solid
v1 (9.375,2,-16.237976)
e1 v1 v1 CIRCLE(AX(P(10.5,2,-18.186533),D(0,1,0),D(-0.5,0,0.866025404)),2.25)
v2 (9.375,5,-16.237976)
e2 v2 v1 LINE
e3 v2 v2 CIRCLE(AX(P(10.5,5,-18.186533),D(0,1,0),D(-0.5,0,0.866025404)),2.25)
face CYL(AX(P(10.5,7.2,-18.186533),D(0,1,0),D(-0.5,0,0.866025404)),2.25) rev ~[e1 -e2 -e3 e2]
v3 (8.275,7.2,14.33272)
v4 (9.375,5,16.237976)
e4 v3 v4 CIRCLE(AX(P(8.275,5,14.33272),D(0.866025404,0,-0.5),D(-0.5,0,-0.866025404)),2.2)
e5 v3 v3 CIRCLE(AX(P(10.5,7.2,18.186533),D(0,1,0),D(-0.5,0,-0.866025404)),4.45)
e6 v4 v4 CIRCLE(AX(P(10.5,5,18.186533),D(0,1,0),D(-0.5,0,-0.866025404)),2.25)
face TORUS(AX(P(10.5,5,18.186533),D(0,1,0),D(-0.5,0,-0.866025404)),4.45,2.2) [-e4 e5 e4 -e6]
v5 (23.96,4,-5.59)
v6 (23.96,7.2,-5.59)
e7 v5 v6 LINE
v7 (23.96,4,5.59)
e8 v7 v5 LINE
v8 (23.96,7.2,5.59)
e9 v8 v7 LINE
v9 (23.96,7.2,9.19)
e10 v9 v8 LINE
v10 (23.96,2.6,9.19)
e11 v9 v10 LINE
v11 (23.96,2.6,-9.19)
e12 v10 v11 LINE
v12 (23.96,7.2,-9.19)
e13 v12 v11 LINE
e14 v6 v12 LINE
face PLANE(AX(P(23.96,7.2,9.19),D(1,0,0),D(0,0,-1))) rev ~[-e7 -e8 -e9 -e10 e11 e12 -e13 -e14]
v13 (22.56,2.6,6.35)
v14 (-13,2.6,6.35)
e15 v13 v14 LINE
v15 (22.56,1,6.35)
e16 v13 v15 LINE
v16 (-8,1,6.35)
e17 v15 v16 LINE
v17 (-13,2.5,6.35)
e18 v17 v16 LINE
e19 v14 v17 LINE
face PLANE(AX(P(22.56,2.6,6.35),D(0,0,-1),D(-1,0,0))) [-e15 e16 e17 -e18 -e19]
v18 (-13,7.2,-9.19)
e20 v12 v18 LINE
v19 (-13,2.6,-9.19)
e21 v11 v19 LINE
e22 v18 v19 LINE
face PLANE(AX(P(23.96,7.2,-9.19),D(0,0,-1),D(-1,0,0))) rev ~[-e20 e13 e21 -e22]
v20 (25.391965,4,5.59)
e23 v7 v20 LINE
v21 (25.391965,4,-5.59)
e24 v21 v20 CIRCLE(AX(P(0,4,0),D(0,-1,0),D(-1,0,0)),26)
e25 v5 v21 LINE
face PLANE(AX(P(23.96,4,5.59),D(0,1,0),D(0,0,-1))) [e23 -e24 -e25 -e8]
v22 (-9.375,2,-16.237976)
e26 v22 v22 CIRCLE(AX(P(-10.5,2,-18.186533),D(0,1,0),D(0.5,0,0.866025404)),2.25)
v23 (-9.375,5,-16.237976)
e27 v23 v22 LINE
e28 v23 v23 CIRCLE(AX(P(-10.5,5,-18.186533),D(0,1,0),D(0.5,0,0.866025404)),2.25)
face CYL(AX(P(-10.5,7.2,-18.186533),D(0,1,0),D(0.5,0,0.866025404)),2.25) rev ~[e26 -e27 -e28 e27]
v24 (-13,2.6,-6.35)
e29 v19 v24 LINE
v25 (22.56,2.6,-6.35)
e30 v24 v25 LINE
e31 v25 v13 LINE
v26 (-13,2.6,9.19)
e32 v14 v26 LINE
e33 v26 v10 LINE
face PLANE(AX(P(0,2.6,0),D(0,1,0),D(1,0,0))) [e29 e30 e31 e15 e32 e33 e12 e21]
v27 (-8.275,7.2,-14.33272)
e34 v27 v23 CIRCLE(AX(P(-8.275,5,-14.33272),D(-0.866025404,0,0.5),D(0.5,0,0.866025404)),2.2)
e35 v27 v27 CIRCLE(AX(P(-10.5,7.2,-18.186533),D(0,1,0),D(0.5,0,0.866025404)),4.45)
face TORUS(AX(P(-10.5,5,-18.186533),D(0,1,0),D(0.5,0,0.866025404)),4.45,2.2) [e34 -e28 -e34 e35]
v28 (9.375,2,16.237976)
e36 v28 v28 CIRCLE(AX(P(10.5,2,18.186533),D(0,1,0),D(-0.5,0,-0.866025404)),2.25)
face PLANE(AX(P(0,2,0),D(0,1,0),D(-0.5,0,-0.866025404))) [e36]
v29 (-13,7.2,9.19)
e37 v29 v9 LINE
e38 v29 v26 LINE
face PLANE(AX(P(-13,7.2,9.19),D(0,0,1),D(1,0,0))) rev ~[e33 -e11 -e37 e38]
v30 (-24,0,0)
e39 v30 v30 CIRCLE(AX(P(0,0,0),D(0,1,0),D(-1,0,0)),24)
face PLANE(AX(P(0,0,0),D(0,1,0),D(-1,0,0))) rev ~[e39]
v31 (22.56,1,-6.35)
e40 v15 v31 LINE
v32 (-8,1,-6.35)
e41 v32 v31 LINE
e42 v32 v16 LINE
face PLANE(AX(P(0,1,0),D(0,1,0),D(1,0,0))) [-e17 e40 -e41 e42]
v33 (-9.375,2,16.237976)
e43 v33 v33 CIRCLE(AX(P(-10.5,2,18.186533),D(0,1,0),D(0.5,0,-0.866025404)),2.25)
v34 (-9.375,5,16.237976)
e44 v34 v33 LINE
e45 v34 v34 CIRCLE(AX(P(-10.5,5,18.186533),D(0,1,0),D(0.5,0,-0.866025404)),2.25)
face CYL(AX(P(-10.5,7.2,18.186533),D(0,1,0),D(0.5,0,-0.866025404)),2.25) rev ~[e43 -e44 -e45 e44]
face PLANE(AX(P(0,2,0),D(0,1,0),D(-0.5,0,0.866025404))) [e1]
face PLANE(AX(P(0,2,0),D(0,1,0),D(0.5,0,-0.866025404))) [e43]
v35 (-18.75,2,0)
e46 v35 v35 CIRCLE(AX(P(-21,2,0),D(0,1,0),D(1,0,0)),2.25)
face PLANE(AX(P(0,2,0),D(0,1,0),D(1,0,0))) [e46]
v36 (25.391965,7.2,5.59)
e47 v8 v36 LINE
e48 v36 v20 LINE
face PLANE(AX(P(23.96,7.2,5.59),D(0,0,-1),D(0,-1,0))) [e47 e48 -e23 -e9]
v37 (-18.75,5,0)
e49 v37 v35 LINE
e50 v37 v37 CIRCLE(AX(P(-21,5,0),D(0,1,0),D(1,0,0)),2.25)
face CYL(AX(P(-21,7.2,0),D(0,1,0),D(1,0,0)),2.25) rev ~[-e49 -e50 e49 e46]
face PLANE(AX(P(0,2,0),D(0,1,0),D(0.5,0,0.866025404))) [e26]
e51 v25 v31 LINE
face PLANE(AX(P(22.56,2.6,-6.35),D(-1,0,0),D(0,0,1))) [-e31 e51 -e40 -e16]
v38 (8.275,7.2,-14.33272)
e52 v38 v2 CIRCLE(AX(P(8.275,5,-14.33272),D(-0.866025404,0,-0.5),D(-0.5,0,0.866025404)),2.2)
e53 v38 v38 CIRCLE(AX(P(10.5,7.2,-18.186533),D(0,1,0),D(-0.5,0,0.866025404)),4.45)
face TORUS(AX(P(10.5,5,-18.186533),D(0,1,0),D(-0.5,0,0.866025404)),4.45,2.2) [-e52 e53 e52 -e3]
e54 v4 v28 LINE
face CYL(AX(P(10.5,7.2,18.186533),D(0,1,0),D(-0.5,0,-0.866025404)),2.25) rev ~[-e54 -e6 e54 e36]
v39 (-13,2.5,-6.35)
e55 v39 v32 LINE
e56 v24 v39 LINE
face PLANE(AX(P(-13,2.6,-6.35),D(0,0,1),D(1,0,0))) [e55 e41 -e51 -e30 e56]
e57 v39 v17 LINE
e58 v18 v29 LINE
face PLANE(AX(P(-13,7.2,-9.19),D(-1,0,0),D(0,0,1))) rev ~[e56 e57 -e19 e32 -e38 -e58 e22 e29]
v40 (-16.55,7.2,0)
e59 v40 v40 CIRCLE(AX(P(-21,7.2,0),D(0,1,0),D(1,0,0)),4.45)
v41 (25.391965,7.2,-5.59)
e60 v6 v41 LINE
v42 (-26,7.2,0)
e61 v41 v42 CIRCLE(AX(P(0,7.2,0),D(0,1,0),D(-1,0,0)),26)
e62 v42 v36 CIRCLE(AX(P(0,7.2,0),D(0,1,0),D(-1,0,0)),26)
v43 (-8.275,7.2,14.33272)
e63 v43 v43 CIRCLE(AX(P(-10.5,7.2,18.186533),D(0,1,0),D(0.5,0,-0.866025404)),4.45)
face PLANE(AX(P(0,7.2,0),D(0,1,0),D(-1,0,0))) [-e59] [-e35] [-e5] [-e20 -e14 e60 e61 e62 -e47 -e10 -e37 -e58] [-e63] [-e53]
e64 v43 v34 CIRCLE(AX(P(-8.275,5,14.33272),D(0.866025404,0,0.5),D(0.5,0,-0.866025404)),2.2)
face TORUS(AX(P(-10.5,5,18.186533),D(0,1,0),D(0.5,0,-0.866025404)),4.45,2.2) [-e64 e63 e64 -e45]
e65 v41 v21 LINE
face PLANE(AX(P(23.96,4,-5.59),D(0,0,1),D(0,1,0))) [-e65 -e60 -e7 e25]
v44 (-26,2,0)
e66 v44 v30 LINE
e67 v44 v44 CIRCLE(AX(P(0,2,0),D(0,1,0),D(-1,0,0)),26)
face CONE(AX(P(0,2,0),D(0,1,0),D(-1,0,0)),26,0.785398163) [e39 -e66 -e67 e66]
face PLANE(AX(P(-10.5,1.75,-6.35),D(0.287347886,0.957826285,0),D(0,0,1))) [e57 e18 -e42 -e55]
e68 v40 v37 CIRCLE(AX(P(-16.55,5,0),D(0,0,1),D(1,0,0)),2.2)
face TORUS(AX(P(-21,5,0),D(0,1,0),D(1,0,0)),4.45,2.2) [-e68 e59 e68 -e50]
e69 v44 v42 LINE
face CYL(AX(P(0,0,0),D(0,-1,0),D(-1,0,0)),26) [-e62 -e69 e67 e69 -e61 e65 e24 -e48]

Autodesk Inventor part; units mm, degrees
ref_plane "YZ Plane" through (0, 0, 0) normal (1, 0, 0) x (0, 1, 0)
ref_plane "XZ Plane" through (0, 0, 0) normal (0, 1, 0) x (-1, 0, 0)
ref_plane "XY Plane" through (0, 0, 0) normal (0, 0, 1) x (1, 0, 0)
sketch "Sketch1" plane through (0, 0, 0) normal (0, 1, 0) x (-1, 0, 0)
  circle A0 centre (0, 0) radius 26
  dimension "d0" = 52
extrude "Extrusion1" add sketch "Sketch1" along normal blind 7.2
chamfer "Chamfer2" distance 2 angle 45 1 edges at (26, 0, 0)
sketch "Sketch2" plane through (0, 7.2, 0) normal (0, 1, 0) x (1, 0, 0)
  line L0 (-13, -9.19) -> (23.96, -9.19)
  line L1 (23.96, -9.19) -> (23.96, 9.19)
  line L2 (23.96, 9.19) -> (-13, 9.19)
  line L3 (-13, 9.19) -> (-13, -9.19)
  point P0 (0, 0)
  dimension "d5" = 36.96
  dimension "d6" = 18.38
  dimension "d7" = 9.19
  dimension "d8" = 13
extrude "Extrusion2" cut sketch "Sketch2" against normal blind 4.6
sketch "Sketch3" plane through (23.96, 7.2, -9.19) normal (-1, 0, 0) x (0, 0, 1)
  line L0 (3.6, 0) -> (14.78, 0)
  line L1 (14.78, 0) -> (14.78, -3.2)
  line L2 (14.78, -3.2) -> (3.6, -3.2)
  line L3 (3.6, -3.2) -> (3.6, 0)
  line L4 (0, 0) -> (18.38, 0) projected
  line L5 (0, -4.6) -> (18.38, -4.6) projected
  line L6 (0, 0) -> (0, -4.6) projected
  line L7 (18.38, 0) -> (18.38, -4.6) projected
  point P0 (9.19, -7.2)
  dimension "d11" = 0
  dimension "d14" = 3.6
  dimension "d44" = 3.6
  dimension "d47" = 1.4
extrude "Extrusion3" cut sketch "Sketch3" against normal through all contours L0 L1 L2 L3
ref_plane "Work Plane1" through (-13, 7.2, 0) normal (0, 0, 1) x (1, 0, 0)
sketch "Sketch7" plane through (0, 2.6, 0) normal (0, 1, 0) x (1, 0, 0)
  line L0 (-13, 6.35) -> (22.56, 6.35)
  line L1 (22.56, 6.35) -> (22.56, -6.35)
  line L2 (22.56, -6.35) -> (-13, -6.35)
  line L3 (-13, -6.35) -> (-13, 6.35)
  line L4 (36.4, 0) -> (-36.4, 0) projected
  line L5 (-13, -9.19) -> (-13, 9.19) projected
  point P0 (0, 0)
  dimension "d28" = 12.7
  dimension "d29" = 35.56
  dimension "d30" = 6.35
  dimension "d31" = 0
extrude "Extrusion5" cut sketch "Sketch7" against normal blind 1.6
sketch "Sketch4" plane through (0, 7.2, 0) normal (0, 1, 0) x (1, 0, 0)
  circle A0 centre (-21, 0) radius 2.25
  arc A1 (25.392, 5.59) -> (25.392, -5.59) centre (0, 0) ccw projected
  point P0 (24.6995, 8.12)
  point P1 (24.6995, -8.12)
  dimension "d17" = 4.5
  dimension "d23" = 21
extrude "Extrusion4" cut sketch "Sketch4" against normal blind 5.2
fillet "Fillet4" radius 2.2 1 edges at (-23.25, 7.2, 0)
pattern_circular "Circular Pattern2" count 5 over 240 about axis through (0, 7.2, 0) along (0, 1, 0) of "Extrusion4", "Fillet4" both ways yes
chamfer "Chamfer3" distance 1.5 distance2 5 1 edges at (-13, 1, 0) measured on face at (-13, 5.6667, -2.1167)
equation "\"d7\" = 0.5 * d6"
equation "\"d44\" = d14"
equation "\"d30\" = 0.5 * d28"
equation "\"d24\" = 0.5 * d6"
properties part number "_3DPrint"
